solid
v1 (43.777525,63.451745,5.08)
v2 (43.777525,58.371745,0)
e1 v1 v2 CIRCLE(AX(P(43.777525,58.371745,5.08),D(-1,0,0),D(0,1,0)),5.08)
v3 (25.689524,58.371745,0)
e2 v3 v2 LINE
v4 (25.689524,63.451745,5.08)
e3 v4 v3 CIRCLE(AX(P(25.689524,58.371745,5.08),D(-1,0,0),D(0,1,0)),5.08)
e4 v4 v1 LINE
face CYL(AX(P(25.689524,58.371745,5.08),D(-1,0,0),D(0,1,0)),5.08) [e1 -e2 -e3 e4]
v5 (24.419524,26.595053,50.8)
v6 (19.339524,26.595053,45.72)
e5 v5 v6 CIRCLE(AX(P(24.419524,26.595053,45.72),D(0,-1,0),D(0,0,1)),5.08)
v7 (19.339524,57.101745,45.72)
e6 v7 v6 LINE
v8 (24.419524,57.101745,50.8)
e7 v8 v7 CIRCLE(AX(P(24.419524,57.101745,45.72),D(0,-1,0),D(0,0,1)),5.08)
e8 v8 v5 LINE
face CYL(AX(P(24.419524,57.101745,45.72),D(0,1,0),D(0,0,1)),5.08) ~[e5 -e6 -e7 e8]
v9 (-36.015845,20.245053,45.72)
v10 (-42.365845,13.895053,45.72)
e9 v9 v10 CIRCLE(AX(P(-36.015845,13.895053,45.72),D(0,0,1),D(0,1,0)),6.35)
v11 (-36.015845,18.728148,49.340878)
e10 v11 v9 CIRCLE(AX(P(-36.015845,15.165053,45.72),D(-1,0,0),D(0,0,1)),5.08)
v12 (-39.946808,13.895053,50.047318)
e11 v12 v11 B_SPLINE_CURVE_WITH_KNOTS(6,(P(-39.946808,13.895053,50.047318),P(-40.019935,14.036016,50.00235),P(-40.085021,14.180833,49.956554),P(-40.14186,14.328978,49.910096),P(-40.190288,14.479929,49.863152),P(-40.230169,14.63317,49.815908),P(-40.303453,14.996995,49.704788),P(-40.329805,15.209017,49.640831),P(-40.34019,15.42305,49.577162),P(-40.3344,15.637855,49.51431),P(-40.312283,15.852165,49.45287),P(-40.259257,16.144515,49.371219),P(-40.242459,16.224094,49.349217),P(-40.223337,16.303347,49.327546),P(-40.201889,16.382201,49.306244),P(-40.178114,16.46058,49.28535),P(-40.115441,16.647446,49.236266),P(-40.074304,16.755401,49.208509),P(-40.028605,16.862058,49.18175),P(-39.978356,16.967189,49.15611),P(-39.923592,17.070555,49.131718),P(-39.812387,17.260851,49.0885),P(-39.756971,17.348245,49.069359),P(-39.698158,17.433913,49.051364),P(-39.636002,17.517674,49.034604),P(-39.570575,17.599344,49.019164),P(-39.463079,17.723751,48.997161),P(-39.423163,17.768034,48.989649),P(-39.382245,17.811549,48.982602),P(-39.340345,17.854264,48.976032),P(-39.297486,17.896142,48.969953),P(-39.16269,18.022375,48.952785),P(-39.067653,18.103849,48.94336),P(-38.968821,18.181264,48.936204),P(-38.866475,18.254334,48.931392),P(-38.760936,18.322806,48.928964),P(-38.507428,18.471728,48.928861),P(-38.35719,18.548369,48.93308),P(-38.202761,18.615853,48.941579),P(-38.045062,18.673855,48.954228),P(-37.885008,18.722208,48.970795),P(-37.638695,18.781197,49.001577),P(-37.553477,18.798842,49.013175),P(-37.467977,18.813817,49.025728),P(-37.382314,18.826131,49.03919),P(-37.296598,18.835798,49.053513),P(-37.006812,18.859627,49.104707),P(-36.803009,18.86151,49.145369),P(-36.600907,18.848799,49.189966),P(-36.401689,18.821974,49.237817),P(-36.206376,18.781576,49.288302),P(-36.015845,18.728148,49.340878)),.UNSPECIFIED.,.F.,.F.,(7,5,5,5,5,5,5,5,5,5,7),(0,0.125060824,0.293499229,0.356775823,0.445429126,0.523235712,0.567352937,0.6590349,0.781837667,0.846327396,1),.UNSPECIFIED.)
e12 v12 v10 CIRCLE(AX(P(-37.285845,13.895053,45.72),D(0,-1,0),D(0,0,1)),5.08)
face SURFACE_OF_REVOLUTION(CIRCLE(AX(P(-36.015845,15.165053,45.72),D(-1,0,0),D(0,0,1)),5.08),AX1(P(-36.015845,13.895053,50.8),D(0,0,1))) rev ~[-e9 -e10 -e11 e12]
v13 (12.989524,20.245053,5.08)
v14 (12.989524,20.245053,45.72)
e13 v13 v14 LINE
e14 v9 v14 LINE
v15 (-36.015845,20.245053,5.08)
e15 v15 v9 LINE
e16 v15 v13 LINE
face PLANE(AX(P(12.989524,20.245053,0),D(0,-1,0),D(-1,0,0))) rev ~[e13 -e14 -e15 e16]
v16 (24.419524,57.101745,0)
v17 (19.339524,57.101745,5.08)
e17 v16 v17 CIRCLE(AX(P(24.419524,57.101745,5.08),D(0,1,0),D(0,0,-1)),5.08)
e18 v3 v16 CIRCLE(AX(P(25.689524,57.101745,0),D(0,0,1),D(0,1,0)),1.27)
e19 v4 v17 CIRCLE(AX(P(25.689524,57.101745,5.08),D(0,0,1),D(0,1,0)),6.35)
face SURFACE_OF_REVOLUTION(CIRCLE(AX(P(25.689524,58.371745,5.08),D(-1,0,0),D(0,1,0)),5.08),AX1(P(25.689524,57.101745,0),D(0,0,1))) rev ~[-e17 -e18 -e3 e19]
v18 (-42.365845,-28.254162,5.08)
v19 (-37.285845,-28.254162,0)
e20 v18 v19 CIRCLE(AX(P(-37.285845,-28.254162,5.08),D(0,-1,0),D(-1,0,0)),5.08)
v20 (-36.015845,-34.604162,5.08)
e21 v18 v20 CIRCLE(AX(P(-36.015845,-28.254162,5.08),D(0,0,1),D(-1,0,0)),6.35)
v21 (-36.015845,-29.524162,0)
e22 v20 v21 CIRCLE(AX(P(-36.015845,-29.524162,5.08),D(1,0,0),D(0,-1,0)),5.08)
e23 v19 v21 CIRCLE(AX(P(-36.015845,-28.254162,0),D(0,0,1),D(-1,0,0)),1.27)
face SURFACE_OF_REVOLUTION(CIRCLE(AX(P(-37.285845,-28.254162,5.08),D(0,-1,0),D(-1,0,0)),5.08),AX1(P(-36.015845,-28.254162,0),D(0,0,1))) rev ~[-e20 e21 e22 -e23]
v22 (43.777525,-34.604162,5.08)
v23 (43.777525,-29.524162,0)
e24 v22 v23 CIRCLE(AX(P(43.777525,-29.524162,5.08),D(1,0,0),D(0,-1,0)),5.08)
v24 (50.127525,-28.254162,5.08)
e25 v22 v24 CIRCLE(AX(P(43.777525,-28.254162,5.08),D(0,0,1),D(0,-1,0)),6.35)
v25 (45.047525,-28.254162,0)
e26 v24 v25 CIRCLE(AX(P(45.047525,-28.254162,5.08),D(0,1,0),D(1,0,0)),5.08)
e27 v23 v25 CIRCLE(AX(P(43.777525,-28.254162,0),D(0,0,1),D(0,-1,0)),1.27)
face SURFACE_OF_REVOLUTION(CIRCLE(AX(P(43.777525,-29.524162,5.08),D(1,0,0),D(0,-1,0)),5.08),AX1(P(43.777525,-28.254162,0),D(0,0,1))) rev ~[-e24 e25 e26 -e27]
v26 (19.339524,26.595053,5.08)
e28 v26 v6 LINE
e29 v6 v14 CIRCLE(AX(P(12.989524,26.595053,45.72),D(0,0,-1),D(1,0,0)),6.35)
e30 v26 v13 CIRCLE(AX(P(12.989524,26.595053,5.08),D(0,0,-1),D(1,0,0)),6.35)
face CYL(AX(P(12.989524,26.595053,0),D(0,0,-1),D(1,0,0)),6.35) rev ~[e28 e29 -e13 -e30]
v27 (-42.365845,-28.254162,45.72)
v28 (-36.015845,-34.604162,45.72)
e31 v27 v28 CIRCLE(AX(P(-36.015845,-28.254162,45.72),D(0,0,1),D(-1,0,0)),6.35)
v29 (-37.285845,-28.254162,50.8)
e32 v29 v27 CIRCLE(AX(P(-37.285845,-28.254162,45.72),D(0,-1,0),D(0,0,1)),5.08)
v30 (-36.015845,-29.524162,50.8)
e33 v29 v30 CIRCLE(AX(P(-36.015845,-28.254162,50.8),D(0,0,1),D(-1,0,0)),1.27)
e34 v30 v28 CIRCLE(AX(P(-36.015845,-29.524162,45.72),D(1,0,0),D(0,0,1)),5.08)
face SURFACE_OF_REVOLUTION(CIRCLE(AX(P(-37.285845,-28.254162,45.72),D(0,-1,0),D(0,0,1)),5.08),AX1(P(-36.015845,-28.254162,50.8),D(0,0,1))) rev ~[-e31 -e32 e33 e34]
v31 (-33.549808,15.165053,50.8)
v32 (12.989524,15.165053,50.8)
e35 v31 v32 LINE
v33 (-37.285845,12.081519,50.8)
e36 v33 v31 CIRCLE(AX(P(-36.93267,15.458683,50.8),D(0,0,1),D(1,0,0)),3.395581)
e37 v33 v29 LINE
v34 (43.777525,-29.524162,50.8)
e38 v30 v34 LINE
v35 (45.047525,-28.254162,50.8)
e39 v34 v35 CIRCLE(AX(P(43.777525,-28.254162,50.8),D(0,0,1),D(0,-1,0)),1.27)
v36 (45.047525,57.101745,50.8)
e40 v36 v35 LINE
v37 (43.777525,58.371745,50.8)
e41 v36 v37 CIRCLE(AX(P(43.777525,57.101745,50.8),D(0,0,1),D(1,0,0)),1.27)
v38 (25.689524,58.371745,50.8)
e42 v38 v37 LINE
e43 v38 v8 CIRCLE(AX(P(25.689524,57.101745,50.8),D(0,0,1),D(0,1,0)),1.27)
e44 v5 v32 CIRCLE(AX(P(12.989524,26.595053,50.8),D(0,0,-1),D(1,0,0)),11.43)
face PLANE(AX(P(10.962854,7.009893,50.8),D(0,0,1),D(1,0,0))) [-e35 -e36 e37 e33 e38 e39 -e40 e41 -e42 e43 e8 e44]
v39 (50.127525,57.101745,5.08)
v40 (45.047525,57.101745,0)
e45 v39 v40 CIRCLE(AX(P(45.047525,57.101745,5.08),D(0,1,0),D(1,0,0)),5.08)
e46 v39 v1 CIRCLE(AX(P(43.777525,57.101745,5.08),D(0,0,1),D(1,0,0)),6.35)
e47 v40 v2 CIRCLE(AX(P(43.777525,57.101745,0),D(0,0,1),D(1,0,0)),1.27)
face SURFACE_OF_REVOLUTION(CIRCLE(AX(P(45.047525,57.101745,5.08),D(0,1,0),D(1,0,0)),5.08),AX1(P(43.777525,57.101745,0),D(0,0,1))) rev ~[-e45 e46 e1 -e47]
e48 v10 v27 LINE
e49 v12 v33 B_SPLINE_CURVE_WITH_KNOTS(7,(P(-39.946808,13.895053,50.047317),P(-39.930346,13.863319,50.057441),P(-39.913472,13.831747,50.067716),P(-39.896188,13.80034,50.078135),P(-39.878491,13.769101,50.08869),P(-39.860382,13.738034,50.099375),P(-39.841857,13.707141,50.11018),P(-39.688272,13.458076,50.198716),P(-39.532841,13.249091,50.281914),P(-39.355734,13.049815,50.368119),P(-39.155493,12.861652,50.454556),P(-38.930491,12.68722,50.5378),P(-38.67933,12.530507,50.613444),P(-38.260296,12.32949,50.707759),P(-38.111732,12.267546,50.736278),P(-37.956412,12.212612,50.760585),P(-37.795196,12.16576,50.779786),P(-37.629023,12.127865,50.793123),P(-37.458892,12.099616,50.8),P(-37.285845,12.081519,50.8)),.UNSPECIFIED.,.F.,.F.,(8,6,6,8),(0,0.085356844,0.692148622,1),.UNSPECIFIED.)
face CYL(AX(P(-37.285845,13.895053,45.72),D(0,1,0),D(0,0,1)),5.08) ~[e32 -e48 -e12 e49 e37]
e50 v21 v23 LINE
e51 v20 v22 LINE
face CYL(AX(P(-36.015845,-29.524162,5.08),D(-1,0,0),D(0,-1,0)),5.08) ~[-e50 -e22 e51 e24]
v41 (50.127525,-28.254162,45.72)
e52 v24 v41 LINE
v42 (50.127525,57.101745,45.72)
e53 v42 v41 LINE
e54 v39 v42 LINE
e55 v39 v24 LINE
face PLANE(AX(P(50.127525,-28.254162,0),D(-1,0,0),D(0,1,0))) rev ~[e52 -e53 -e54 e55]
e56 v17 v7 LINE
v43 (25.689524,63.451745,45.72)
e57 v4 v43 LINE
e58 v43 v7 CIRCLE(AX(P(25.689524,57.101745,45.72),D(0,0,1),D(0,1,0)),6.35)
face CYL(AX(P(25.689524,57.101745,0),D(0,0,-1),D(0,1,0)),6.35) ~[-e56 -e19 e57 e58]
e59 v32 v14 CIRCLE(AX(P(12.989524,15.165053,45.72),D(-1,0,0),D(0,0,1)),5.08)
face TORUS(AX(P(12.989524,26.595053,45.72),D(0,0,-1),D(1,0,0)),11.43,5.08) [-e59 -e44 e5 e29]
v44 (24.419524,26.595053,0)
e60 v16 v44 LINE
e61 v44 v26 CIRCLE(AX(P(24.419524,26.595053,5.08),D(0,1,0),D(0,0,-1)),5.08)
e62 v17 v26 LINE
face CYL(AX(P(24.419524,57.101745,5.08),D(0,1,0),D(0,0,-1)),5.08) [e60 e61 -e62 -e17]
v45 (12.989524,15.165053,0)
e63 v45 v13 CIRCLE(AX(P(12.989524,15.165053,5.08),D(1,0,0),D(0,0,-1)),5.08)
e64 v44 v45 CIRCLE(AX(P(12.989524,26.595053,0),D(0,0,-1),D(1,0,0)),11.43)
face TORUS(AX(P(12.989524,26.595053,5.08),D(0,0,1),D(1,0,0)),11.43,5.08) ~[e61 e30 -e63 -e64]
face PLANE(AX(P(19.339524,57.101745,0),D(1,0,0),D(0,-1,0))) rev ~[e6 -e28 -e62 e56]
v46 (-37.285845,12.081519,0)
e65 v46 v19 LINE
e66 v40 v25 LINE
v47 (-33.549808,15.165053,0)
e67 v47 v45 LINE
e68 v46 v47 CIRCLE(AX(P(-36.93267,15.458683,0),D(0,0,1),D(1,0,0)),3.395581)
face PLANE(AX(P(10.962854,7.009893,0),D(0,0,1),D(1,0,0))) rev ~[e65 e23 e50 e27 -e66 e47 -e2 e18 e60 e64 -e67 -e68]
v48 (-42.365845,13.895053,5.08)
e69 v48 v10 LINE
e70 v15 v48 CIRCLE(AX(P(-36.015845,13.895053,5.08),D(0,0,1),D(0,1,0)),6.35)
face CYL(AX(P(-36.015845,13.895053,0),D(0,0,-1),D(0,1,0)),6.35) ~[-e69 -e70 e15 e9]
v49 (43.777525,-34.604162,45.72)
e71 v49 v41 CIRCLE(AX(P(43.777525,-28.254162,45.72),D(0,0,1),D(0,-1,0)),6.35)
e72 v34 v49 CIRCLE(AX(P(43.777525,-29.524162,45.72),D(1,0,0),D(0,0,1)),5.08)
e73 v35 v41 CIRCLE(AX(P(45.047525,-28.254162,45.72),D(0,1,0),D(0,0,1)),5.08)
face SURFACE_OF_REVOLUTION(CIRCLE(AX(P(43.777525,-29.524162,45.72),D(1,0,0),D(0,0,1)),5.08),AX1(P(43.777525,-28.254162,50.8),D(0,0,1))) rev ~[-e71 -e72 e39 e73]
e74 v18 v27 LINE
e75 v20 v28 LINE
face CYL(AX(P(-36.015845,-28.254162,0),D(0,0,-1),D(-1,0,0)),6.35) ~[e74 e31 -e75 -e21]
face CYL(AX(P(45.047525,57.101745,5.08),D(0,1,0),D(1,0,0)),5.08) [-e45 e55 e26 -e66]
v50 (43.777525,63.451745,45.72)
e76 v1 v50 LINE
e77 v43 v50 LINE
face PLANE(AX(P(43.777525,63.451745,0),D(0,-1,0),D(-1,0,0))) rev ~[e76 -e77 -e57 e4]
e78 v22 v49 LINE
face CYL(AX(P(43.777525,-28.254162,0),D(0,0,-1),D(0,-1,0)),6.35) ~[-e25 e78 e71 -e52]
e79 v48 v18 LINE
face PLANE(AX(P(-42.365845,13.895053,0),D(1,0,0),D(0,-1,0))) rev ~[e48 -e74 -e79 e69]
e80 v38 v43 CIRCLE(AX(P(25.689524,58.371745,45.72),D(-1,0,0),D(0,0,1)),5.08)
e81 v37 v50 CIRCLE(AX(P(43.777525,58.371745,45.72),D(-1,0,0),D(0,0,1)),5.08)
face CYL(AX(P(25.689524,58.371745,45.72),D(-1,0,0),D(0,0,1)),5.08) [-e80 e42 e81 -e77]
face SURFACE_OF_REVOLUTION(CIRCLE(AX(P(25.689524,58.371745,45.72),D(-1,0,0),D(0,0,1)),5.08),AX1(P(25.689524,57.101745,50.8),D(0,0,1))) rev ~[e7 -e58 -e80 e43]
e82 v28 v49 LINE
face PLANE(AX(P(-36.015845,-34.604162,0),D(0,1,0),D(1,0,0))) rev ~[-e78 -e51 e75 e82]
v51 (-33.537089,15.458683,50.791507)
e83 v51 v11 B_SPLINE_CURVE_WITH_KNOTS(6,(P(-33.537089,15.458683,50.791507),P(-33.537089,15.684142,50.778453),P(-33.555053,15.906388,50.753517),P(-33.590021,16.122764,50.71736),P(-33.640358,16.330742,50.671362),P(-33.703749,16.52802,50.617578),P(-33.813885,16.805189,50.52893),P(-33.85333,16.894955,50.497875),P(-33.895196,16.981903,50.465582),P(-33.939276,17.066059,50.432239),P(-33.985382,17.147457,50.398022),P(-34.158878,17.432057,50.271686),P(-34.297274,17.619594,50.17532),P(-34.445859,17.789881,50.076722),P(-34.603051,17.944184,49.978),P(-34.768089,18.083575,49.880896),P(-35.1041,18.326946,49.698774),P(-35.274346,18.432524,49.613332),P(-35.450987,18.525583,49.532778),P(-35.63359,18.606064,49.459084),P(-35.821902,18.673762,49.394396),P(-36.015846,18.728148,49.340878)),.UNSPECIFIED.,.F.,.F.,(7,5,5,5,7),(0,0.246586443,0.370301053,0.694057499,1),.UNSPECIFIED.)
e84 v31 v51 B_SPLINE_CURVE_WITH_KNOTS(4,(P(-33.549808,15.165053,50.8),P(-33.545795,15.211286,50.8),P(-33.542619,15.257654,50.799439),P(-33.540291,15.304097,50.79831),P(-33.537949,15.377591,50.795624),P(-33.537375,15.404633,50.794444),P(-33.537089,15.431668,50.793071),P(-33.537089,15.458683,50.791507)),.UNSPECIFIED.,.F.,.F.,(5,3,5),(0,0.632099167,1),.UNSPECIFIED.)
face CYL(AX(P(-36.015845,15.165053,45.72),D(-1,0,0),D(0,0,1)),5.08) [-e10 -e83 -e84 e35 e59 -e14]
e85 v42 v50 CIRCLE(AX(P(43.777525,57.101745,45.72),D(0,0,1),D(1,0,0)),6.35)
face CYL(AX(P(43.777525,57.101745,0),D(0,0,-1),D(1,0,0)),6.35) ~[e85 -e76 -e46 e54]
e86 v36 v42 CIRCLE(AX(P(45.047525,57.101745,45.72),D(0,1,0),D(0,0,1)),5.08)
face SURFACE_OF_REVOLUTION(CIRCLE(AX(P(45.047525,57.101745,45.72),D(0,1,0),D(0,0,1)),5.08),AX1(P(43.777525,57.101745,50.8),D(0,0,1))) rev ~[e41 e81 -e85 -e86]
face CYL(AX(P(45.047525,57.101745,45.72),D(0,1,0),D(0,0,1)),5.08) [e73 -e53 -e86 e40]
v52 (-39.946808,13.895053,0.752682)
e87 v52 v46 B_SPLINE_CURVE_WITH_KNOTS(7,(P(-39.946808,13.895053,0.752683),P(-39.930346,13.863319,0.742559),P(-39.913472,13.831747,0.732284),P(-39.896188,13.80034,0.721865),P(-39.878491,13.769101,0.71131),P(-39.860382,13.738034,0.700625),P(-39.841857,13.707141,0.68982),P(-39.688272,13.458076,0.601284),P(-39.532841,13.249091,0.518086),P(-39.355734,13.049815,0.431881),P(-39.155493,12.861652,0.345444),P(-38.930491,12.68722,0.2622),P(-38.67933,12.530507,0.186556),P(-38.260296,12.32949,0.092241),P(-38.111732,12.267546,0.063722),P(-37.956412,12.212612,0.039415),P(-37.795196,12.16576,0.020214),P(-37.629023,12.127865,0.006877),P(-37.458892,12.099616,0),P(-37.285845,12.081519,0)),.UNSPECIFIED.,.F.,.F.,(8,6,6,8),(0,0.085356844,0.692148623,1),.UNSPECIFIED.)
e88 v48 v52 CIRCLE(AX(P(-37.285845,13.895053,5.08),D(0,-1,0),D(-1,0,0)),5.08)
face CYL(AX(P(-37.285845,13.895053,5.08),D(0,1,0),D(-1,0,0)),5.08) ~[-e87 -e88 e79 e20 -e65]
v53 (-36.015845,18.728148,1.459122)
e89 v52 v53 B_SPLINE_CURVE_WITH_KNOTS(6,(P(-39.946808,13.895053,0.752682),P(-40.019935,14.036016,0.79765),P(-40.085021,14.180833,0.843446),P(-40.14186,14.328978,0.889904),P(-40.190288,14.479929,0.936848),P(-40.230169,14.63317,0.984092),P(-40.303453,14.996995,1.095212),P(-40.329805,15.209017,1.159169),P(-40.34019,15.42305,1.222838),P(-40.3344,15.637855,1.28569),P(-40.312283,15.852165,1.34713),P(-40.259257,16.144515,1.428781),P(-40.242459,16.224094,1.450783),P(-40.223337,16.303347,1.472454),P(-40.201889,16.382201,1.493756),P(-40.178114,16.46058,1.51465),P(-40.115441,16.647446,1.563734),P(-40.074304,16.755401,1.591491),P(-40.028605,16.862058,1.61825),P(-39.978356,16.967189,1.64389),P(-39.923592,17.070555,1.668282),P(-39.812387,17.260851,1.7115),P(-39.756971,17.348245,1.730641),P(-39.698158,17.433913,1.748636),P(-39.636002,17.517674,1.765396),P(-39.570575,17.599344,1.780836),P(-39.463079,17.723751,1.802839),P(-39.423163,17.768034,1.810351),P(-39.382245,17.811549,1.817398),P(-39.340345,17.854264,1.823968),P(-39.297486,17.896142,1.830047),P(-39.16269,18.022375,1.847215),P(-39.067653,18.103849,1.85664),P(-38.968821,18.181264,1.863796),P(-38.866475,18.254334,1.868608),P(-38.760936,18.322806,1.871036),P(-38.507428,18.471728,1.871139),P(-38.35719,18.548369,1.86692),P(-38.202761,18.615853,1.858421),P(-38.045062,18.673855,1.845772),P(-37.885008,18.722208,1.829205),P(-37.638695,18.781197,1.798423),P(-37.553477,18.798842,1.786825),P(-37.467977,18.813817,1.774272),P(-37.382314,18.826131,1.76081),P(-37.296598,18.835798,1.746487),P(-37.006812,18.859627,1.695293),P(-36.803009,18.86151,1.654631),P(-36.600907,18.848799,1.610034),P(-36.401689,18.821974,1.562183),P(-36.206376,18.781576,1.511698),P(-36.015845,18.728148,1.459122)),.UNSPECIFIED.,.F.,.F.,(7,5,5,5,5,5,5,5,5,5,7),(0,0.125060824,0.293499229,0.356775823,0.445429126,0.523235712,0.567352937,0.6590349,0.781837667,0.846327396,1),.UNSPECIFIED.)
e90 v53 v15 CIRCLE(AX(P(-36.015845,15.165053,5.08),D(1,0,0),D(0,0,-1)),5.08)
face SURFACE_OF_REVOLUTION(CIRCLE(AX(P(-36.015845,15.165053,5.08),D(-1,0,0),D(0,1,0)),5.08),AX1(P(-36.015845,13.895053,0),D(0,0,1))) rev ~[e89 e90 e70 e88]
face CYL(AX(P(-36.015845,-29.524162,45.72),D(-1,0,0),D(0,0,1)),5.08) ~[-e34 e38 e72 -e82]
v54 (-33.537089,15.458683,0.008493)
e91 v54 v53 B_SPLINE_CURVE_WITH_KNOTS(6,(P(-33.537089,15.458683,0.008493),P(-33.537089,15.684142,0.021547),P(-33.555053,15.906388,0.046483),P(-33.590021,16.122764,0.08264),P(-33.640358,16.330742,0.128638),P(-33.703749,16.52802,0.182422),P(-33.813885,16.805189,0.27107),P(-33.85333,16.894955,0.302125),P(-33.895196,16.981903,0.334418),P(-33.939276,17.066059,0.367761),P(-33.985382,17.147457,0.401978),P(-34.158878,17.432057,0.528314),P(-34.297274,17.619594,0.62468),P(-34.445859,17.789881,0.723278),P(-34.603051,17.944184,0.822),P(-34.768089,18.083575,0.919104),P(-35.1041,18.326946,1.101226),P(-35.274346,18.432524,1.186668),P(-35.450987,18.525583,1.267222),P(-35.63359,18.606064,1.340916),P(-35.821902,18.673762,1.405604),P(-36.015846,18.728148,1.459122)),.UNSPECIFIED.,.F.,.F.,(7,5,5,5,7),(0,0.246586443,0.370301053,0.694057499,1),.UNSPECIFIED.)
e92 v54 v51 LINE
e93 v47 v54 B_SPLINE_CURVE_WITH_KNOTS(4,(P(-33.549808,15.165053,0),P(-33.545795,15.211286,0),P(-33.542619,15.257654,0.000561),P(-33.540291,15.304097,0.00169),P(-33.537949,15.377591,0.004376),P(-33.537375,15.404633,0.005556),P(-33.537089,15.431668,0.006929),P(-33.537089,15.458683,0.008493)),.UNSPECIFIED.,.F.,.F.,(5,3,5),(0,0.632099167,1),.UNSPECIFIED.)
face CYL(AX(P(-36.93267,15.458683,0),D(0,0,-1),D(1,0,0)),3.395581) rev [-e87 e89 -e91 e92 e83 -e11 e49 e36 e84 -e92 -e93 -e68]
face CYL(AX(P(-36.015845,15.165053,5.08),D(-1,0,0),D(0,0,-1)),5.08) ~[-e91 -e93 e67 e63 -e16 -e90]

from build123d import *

# Parameters (mm, degrees)
F0_R         = 3.3955807327
F1_DEPTH     = 50.8
F2_T1_DEPTH  = 79.7933701754
F2_T3_DEPTH  = 85.3559065938
F2_T5_DEPTH  = 18.0880006731
F2_T7_DEPTH  = 30.5066917419
F2_T9_DEPTH  = 49.0053695023
F2_T11_DEPTH = 42.1492148519
F2_T14_ANGLE = 90
F2_T16_ANGLE = 90
F2_T18_ANGLE = 90
F2_T20_ANGLE = 90
F2_T22_ANGLE = 90
F2_T24_ANGLE = 90
F2_T26_ANGLE = 90
F2_T28_ANGLE = 90
F2_T30_ANGLE = 90
F2_T32_ANGLE = 90
F2_T34_ANGLE = 90
F2_T36_ANGLE = 90


# Not quite as in the source:
# - a fillet or chamfer that OpenCascade refuses, or shapes differently, is made with other operations: its cross-section is extruded or revolved along the edge and cut away or added


with BuildPart() as f1:
    # F0 (on Top) → F1 (new body)
    with BuildSketch(Plane.XY):
        with BuildLine():
            Line((12.9895242095, 20.2450528741), (-36.0158452928, 20.2450528741))
            ThreePointArc((-36.0158452928, 20.2450528741), (-40.5059733533, 18.3851809346), (-42.3658452928, 13.8950528741))
            Line((-42.3658452928, 13.8950528741), (-42.3658452928, -28.2541619778))
            ThreePointArc((-42.3658452928, -28.2541619778), (-40.5059733533, -32.7442900383), (-36.0158452928, -34.6041619778))
            Line((-36.0158452928, -34.6041619778), (43.7775248826, -34.6041619778))
            ThreePointArc((43.7775248826, -34.6041619778), (48.2676529431, -32.7442900383), (50.1275248826, -28.2541619778))
            Line((50.1275248826, -28.2541619778), (50.1275248826, 20.2450528741))
            Line((50.1275248826, 20.2450528741), (50.1275248826, 57.101744616))
            ThreePointArc((50.1275248826, 57.101744616), (48.2676529431, 61.5918726766), (43.7775248826, 63.451744616))
            Line((43.7775248826, 63.451744616), (25.6895242095, 63.451744616))
            ThreePointArc((25.6895242095, 63.451744616), (21.199396149, 61.5918726766), (19.3395242095, 57.101744616))
            Line((19.3395242095, 57.101744616), (19.3395242095, 26.5950528741))
            ThreePointArc((19.3395242095, 26.5950528741), (17.47965227, 22.1049248136), (12.9895242095, 20.2450528741))
        make_face()
        with Locations((-36.93266958, 15.458682552)):
            Circle(F0_R, mode=Mode.SUBTRACT)
    extrude(amount=F1_DEPTH)

    # F2: fillet of radius 5.08 on 2 edges, made by hand

    # F2_s2 → F2_t1 (cut)
    with BuildSketch(Plane.YZ.offset(-36.0158452928)):
        with BuildLine():
            ThreePointArc((-29.5241619778, 50.8), (-33.1162644262, 49.3121024484), (-34.6041619778, 45.72))
            Line((-34.6041619778, 45.72), (-34.6041619778, 50.8))
            Line((-34.6041619778, 50.8), (-29.5241619778, 50.8))
        make_face()
        with BuildLine():
            ThreePointArc((-34.6041619778, 5.08), (-33.1162644262, 1.4878975516), (-29.5241619778, 0))
            Line((-29.5241619778, 0), (-34.6041619778, 0))
            Line((-34.6041619778, 0), (-34.6041619778, 5.08))
        make_face()
    extrude(amount=F2_T1_DEPTH, mode=Mode.SUBTRACT)

    # F2_s4 → F2_t3 (cut)
    with BuildSketch(Plane.XZ.offset(-57.101744616)):
        with BuildLine():
            ThreePointArc((50.1275248826, 5.08), (48.639627331, 1.4878975516), (45.0475248826, 0))
            Line((45.0475248826, 0), (50.1275248826, 0))
            Line((50.1275248826, 0), (50.1275248826, 5.08))
        make_face()
        with BuildLine():
            ThreePointArc((45.0475248826, 50.8), (48.639627331, 49.3121024484), (50.1275248826, 45.72))
            Line((50.1275248826, 45.72), (50.1275248826, 50.8))
            Line((50.1275248826, 50.8), (45.0475248826, 50.8))
        make_face()
    extrude(amount=F2_T3_DEPTH, mode=Mode.SUBTRACT)

    # F2_s6 → F2_t5 (cut)
    with BuildSketch(Plane.YZ.offset(25.6895242095)):
        with BuildLine():
            ThreePointArc((63.451744616, 5.08), (61.9638470645, 1.4878975516), (58.371744616, 0))
            Line((58.371744616, 0), (63.451744616, 0))
            Line((63.451744616, 0), (63.451744616, 5.08))
        make_face()
        with BuildLine():
            ThreePointArc((58.371744616, 50.8), (61.9638470645, 49.3121024484), (63.451744616, 45.72))
            Line((63.451744616, 45.72), (63.451744616, 50.8))
            Line((63.451744616, 50.8), (58.371744616, 50.8))
        make_face()
    extrude(amount=F2_T5_DEPTH, mode=Mode.SUBTRACT)

    # F2_s8 → F2_t7 (cut)
    with BuildSketch(Plane.XZ.offset(-57.101744616)):
        with BuildLine():
            ThreePointArc((24.4195242095, 0), (20.8274217611, 1.4878975516), (19.3395242095, 5.08))
            Line((19.3395242095, 5.08), (19.3395242095, 0))
            Line((19.3395242095, 0), (24.4195242095, 0))
        make_face()
        with BuildLine():
            ThreePointArc((24.4195242095, 50.8), (20.8274217611, 49.3121024484), (19.3395242095, 45.72))
            Line((19.3395242095, 45.72), (19.3395242095, 50.8))
            Line((19.3395242095, 50.8), (24.4195242095, 50.8))
        make_face()
    extrude(amount=F2_T7_DEPTH, mode=Mode.SUBTRACT)

    # F2_s10 → F2_t9 (cut)
    with BuildSketch(Plane.YZ.offset(-36.0158452928)):
        with BuildLine():
            ThreePointArc((15.1650528741, 0), (18.7571553225, 1.4878975516), (20.2450528741, 5.08))
            Line((20.2450528741, 5.08), (20.2450528741, 0))
            Line((20.2450528741, 0), (15.1650528741, 0))
        make_face()
        with BuildLine():
            ThreePointArc((15.1650528741, 50.8), (18.7571553225, 49.3121024484), (20.2450528741, 45.72))
            Line((20.2450528741, 45.72), (20.2450528741, 50.8))
            Line((20.2450528741, 50.8), (15.1650528741, 50.8))
        make_face()
    extrude(amount=F2_T9_DEPTH, mode=Mode.SUBTRACT)

    # F2_s12 → F2_t11 (cut)
    with BuildSketch(Plane.XZ.offset(-13.8950528741)):
        with BuildLine():
            ThreePointArc((-42.3658452928, 5.08), (-40.8779477412, 1.4878975516), (-37.2858452928, 0))
            Line((-37.2858452928, 0), (-42.3658452928, 0))
            Line((-42.3658452928, 0), (-42.3658452928, 5.08))
        make_face()
        with BuildLine():
            ThreePointArc((-37.2858452928, 50.8), (-40.8779477412, 49.3121024484), (-42.3658452928, 45.72))
            Line((-42.3658452928, 45.72), (-42.3658452928, 50.8))
            Line((-42.3658452928, 50.8), (-37.2858452928, 50.8))
        make_face()
    extrude(amount=F2_T11_DEPTH, mode=Mode.SUBTRACT)

    # F2_s13 → F2_t14 (revolve, cut)
    with BuildSketch(Plane.XZ.offset(28.2541619778)):
        with BuildLine():
            ThreePointArc((-42.3658452928, 5.08), (-40.8779477412, 1.4878975516), (-37.2858452928, 0))
            Line((-37.2858452928, 0), (-42.3658452928, 0))
            Line((-42.3658452928, 0), (-42.3658452928, 5.08))
        make_face()
    revolve(axis=Axis((-36.0158452928, -28.2541619778, 0), (0, 0, 1)), revolution_arc=F2_T14_ANGLE, mode=Mode.SUBTRACT)

    # F2_s15 → F2_t16 (revolve, cut)
    with BuildSketch(Plane.YZ.offset(43.7775248826)):
        with BuildLine():
            ThreePointArc((-34.6041619778, 5.08), (-33.1162644262, 1.4878975516), (-29.5241619778, 0))
            Line((-29.5241619778, 0), (-34.6041619778, 0))
            Line((-34.6041619778, 0), (-34.6041619778, 5.08))
        make_face()
    revolve(axis=Axis((43.7775248826, -28.2541619778, 0), (0, 0, 1)), revolution_arc=F2_T16_ANGLE, mode=Mode.SUBTRACT)

    # F2_s17 → F2_t18 (revolve, cut)
    with BuildSketch(Plane.XZ.offset(-57.101744616)):
        with BuildLine():
            ThreePointArc((50.1275248826, 5.08), (48.639627331, 1.4878975516), (45.0475248826, 0))
            Line((45.0475248826, 0), (50.1275248826, 0))
            Line((50.1275248826, 0), (50.1275248826, 5.08))
        make_face()
    revolve(axis=Axis((43.7775248826, 57.101744616, 0), (0, 0, 1)), revolution_arc=F2_T18_ANGLE, mode=Mode.SUBTRACT)

    # F2_s19 → F2_t20 (revolve, cut)
    with BuildSketch(Plane.YZ.offset(25.6895242095)):
        with BuildLine():
            ThreePointArc((63.451744616, 5.08), (61.9638470645, 1.4878975516), (58.371744616, 0))
            Line((58.371744616, 0), (63.451744616, 0))
            Line((63.451744616, 0), (63.451744616, 5.08))
        make_face()
    revolve(axis=Axis((25.6895242095, 57.101744616, 0), (0, 0, 1)), revolution_arc=F2_T20_ANGLE, mode=Mode.SUBTRACT)

    # F2_s21 → F2_t22 (revolve, cut)
    with BuildSketch(Plane.XZ.offset(-26.5950528741)):
        with BuildLine():
            ThreePointArc((19.3395242095, 5.08), (20.8274217611, 1.4878975516), (24.4195242095, 0))
            Line((24.4195242095, 0), (19.3395242095, 0))
            Line((19.3395242095, 0), (19.3395242095, 5.08))
        make_face()
    revolve(axis=Axis((12.9895242095, 26.5950528741, 0), (0, 0, -1)), revolution_arc=F2_T22_ANGLE, mode=Mode.SUBTRACT)

    # F2_s23 → F2_t24 (revolve, cut)
    with BuildSketch(Plane.YZ.offset(-36.0158452928)):
        with BuildLine():
            ThreePointArc((20.2450528741, 5.08), (18.7571553225, 1.4878975516), (15.1650528741, 0))
            Line((15.1650528741, 0), (20.2450528741, 0))
            Line((20.2450528741, 0), (20.2450528741, 5.08))
        make_face()
    revolve(axis=Axis((-36.0158452928, 13.8950528741, 0), (0, 0, 1)), revolution_arc=F2_T24_ANGLE, mode=Mode.SUBTRACT)

    # F2_s25 → F2_t26 (revolve, cut)
    with BuildSketch(Plane.XZ.offset(28.2541619778)):
        with BuildLine():
            ThreePointArc((-37.2858452928, 50.8), (-40.8779477412, 49.3121024484), (-42.3658452928, 45.72))
            Line((-42.3658452928, 45.72), (-42.3658452928, 50.8))
            Line((-42.3658452928, 50.8), (-37.2858452928, 50.8))
        make_face()
    revolve(axis=Axis((-36.0158452928, -28.2541619778, 50.8), (0, 0, 1)), revolution_arc=F2_T26_ANGLE, mode=Mode.SUBTRACT)

    # F2_s27 → F2_t28 (revolve, cut)
    with BuildSketch(Plane.YZ.offset(43.7775248826)):
        with BuildLine():
            ThreePointArc((-29.5241619778, 50.8), (-33.1162644262, 49.3121024484), (-34.6041619778, 45.72))
            Line((-34.6041619778, 45.72), (-34.6041619778, 50.8))
            Line((-34.6041619778, 50.8), (-29.5241619778, 50.8))
        make_face()
    revolve(axis=Axis((43.7775248826, -28.2541619778, 50.8), (0, 0, 1)), revolution_arc=F2_T28_ANGLE, mode=Mode.SUBTRACT)

    # F2_s29 → F2_t30 (revolve, cut)
    with BuildSketch(Plane.XZ.offset(-57.101744616)):
        with BuildLine():
            ThreePointArc((45.0475248826, 50.8), (48.639627331, 49.3121024484), (50.1275248826, 45.72))
            Line((50.1275248826, 45.72), (50.1275248826, 50.8))
            Line((50.1275248826, 50.8), (45.0475248826, 50.8))
        make_face()
    revolve(axis=Axis((43.7775248826, 57.101744616, 50.8), (0, 0, 1)), revolution_arc=F2_T30_ANGLE, mode=Mode.SUBTRACT)

    # F2_s31 → F2_t32 (revolve, cut)
    with BuildSketch(Plane.YZ.offset(25.6895242095)):
        with BuildLine():
            ThreePointArc((58.371744616, 50.8), (61.9638470645, 49.3121024484), (63.451744616, 45.72))
            Line((63.451744616, 45.72), (63.451744616, 50.8))
            Line((63.451744616, 50.8), (58.371744616, 50.8))
        make_face()
    revolve(axis=Axis((25.6895242095, 57.101744616, 50.8), (0, 0, 1)), revolution_arc=F2_T32_ANGLE, mode=Mode.SUBTRACT)

    # F2_s33 → F2_t34 (revolve, cut)
    with BuildSketch(Plane.XZ.offset(-26.5950528741)):
        with BuildLine():
            ThreePointArc((19.3395242095, 45.72), (20.8274217611, 49.3121024484), (24.4195242095, 50.8))
            Line((24.4195242095, 50.8), (19.3395242095, 50.8))
            Line((19.3395242095, 50.8), (19.3395242095, 45.72))
        make_face()
    revolve(axis=Axis((12.9895242095, 26.5950528741, 50.8), (0, 0, -1)), revolution_arc=F2_T34_ANGLE, mode=Mode.SUBTRACT)

    # F2_s35 → F2_t36 (revolve, cut)
    with BuildSketch(Plane.YZ.offset(-36.0158452928)):
        with BuildLine():
            ThreePointArc((15.1650528741, 50.8), (18.7571553225, 49.3121024484), (20.2450528741, 45.72))
            Line((20.2450528741, 45.72), (20.2450528741, 50.8))
            Line((20.2450528741, 50.8), (15.1650528741, 50.8))
        make_face()
    revolve(axis=Axis((-36.0158452928, 13.8950528741, 50.8), (0, 0, 1)), revolution_arc=F2_T36_ANGLE, mode=Mode.SUBTRACT)


solid = f1.part
